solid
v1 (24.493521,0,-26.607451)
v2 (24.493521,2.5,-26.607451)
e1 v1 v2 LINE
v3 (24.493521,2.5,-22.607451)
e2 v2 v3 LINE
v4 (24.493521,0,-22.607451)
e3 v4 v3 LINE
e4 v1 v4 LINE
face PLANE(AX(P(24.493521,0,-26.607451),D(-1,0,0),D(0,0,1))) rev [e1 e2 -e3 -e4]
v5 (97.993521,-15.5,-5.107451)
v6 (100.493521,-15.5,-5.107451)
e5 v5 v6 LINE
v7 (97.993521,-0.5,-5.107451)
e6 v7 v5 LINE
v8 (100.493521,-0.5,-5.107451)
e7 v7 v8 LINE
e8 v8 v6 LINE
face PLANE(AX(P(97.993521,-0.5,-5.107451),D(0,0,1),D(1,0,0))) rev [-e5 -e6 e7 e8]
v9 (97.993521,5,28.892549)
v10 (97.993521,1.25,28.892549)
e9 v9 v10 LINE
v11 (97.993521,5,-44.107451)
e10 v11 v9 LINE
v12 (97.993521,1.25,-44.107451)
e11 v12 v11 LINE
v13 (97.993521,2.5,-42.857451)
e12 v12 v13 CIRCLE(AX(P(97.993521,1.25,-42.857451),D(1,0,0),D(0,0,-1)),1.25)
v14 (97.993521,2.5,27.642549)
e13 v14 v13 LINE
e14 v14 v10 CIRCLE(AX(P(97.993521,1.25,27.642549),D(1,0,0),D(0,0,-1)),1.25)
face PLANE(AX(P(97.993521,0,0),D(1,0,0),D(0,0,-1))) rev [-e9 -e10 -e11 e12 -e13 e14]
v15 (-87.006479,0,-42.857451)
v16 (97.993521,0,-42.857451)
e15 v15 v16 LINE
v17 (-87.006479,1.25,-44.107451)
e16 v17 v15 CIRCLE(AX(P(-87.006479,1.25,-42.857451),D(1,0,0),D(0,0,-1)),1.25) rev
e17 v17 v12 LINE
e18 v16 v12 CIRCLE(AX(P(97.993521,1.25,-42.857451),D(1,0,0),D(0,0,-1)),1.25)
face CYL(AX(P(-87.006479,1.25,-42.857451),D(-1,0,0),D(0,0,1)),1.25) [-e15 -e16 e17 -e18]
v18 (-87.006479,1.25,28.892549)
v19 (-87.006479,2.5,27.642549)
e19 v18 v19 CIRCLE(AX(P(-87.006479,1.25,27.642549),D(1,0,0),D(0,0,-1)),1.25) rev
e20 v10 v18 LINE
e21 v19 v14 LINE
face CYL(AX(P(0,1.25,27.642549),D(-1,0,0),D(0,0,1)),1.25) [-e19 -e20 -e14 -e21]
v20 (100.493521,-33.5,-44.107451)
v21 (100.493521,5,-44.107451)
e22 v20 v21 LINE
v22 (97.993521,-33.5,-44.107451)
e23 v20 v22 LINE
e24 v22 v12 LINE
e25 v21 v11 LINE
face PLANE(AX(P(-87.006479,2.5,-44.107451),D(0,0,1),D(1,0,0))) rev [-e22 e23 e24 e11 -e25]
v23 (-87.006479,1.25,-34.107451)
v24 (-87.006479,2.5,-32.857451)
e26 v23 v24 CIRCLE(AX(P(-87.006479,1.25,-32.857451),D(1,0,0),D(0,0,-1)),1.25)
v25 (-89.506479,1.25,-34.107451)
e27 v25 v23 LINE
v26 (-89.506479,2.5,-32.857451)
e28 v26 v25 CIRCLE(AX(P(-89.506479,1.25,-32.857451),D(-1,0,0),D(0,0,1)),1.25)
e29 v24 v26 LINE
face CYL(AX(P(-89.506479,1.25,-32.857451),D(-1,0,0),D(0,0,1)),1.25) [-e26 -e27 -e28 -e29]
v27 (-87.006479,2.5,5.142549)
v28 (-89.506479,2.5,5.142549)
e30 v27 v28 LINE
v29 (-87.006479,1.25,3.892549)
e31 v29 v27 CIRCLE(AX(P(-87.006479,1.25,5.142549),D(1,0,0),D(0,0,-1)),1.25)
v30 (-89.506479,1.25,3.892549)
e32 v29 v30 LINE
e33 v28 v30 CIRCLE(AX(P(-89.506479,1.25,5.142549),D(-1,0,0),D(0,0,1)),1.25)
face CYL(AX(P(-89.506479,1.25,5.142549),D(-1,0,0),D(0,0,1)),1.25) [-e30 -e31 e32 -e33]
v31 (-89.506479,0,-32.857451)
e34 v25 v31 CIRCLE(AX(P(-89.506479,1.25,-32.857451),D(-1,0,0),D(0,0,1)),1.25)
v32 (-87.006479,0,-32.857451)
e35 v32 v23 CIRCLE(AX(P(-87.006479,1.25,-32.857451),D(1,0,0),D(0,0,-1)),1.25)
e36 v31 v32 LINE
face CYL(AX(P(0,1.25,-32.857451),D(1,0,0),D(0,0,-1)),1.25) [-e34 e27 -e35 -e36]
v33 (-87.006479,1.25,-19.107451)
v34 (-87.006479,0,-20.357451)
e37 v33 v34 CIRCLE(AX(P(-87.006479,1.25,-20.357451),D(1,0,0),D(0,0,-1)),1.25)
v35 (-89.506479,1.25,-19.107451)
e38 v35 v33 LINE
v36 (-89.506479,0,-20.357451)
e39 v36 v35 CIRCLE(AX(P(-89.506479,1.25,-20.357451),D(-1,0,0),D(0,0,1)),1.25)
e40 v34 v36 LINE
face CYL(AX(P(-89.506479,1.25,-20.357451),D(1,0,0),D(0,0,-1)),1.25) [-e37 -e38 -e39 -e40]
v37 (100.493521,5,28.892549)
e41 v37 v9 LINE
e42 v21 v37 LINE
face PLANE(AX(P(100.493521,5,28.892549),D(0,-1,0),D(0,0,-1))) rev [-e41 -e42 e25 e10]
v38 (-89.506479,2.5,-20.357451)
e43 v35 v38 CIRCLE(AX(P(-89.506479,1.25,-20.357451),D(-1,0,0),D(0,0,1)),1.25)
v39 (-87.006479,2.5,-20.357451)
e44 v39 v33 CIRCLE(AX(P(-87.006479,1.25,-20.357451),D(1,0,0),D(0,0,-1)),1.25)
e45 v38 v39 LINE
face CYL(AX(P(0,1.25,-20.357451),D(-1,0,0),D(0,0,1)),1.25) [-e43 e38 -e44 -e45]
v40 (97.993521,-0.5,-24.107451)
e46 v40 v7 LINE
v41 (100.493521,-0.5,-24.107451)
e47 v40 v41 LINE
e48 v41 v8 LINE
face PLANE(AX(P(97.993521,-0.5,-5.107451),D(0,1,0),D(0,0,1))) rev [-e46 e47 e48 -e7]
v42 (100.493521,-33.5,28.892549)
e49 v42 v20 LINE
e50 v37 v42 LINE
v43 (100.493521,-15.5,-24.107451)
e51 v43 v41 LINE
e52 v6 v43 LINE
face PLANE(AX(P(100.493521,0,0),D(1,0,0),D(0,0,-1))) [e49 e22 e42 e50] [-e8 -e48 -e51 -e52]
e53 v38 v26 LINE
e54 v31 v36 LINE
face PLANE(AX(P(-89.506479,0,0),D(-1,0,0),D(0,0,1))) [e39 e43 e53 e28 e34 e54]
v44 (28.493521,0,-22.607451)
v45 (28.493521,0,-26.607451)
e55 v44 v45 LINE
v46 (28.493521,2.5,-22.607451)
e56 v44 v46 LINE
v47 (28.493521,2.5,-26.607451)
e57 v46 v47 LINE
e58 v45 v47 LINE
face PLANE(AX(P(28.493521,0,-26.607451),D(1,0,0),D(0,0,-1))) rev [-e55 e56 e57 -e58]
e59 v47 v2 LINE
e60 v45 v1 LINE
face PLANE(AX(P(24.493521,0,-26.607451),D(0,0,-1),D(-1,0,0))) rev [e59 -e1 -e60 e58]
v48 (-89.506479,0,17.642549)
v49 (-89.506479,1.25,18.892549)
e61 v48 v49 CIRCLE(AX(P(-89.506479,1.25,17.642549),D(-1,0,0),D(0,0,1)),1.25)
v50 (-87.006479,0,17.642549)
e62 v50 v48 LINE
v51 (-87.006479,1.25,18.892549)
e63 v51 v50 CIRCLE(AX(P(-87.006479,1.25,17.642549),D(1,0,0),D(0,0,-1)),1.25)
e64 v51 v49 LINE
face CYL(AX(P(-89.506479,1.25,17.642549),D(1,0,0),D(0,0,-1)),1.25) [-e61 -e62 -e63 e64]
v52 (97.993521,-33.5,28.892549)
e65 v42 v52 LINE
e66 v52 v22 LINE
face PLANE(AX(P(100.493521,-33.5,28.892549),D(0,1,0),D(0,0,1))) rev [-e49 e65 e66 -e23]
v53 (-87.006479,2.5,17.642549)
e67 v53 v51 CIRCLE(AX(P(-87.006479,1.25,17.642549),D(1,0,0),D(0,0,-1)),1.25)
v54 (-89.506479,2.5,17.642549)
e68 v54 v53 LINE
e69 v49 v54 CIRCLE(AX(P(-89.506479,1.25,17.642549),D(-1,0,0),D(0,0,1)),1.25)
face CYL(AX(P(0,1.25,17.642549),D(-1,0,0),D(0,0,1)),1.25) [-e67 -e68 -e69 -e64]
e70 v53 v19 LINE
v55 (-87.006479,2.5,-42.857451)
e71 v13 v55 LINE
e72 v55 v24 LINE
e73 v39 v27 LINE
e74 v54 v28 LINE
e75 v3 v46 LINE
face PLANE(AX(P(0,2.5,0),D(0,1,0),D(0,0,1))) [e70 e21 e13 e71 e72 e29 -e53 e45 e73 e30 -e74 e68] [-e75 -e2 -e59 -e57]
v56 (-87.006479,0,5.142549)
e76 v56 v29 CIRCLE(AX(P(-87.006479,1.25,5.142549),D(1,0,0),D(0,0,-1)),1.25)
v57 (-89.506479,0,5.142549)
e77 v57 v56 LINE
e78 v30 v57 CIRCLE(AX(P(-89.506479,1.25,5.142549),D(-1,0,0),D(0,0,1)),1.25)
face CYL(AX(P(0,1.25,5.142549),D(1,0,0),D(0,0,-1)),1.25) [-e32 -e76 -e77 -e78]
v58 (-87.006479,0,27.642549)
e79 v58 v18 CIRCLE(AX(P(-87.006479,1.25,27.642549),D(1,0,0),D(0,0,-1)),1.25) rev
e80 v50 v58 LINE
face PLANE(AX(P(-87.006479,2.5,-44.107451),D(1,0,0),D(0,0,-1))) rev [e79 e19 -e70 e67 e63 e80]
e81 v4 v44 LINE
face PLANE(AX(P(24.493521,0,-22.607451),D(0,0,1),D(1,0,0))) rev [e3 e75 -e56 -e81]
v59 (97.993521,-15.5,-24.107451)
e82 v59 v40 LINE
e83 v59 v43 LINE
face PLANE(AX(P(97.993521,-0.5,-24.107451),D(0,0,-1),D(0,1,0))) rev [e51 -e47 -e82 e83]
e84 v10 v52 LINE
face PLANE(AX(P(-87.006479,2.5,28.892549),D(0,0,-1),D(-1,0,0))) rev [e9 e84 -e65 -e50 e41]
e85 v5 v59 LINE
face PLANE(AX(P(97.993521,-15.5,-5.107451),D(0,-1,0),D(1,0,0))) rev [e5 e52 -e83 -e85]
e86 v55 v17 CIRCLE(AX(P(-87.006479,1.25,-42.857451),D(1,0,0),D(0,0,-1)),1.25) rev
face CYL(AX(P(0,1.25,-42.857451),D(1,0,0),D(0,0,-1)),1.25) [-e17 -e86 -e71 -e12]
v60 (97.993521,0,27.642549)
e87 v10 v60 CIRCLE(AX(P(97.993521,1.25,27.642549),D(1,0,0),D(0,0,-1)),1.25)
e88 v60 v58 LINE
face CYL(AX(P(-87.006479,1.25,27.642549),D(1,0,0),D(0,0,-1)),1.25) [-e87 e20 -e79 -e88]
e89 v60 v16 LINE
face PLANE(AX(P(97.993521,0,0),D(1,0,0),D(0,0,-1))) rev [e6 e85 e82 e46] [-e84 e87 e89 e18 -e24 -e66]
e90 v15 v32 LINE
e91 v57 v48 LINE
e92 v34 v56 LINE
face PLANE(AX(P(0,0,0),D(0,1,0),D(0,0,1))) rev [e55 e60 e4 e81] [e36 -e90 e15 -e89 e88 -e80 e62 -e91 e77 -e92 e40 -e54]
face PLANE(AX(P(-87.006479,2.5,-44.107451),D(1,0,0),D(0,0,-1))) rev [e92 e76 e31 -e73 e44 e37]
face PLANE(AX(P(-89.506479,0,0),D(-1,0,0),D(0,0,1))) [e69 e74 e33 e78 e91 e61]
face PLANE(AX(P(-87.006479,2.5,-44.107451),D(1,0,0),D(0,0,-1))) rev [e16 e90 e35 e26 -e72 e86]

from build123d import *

# Parameters (mm, degrees)
SKETCH_1_W          = 185
SKETCH_1_H          = 73
EXTRUDE_1_DEPTH     = 2.5
SKETCH_2_W          = 15
SKETCH_2_H          = 2.5
EXTRUDE_2_DEPTH     = 2.5
FILLET_2_R          = 1.25
SKETCH_3_W          = 73
SKETCH_3_H          = 38.5
EXTRUDE_3_DEPTH     = 2.5
FILLET_3_R          = 1.25
SKETCH_4_W          = 19
SKETCH_4_H          = 15
CUT_EXTRUDE_1_DEPTH = 2.5
SKETCH_5_W          = 4
SKETCH_5_H          = 4
CUT_EXTRUDE_2_DEPTH = 2.5


with BuildPart() as part:
    # 草图1 → 凸台-拉伸1 (new body)
    with BuildSketch(Plane(origin=(0, 0, 0), x_dir=(1, 0, 0), z_dir=(0, 1, 0))):
        with Locations((5.493520518, 7.607451404)):
            Rectangle(SKETCH_1_W, SKETCH_1_H)
    extrude(amount=EXTRUDE_1_DEPTH)

    # 草图2 → 凸台-拉伸2 (add)
    with BuildSketch(Plane.ZY.offset(87.006479482)):
        with Locations((-26.607451404, 1.25)):
            Rectangle(SKETCH_2_W, SKETCH_2_H)
        with Locations((11.392548596, 1.25)):
            Rectangle(SKETCH_2_W, SKETCH_2_H)
    extrude(amount=EXTRUDE_2_DEPTH)

    # 圆角2
    fillet_2_edges = [part.edges().sort_by_distance(p)[0] for p in [
        (-88.256479482, 2.5, 3.892548596),
        (-88.256479482, 0, 3.892548596),
        (-88.256479482, 0, 18.892548596),
        (-88.256479482, 2.5, 18.892548596),
        (-88.256479482, 0, -34.107451404),
        (-88.256479482, 2.5, -19.107451404),
        (-88.256479482, 0, -19.107451404),
        (-88.256479482, 2.5, -34.107451404),
    ]]
    fillet(fillet_2_edges, radius=FILLET_2_R - 0.0001)  # a hair under: the kernel refuses the full size

    # 草图3 → 凸台-拉伸3 (add)
    with BuildSketch(Plane(origin=(97.993520518, 0, 0), x_dir=(0, 0, -1), z_dir=(1, 0, 0))):
        with Locations((7.607451404, -14.25)):
            Rectangle(SKETCH_3_W, SKETCH_3_H)
    extrude(amount=EXTRUDE_3_DEPTH)

    # 圆角3
    fillet_3_edges = [part.edges().sort_by_distance(p)[0] for p in [
        (5.493520518, 0, -44.107451404),
        (5.493520518, 2.5, -44.107451404),
        (5.493520518, 0, 28.892548596),
        (5.493520518, 2.5, 28.892548596),
    ]]
    fillet(fillet_3_edges, radius=FILLET_3_R - 0.0001)  # a hair under: the kernel refuses the full size

    # 草图4 → 切除-拉伸1 (cut)
    with BuildSketch(Plane(origin=(100.493520518, 0, 0), x_dir=(0, 0, -1), z_dir=(1, 0, 0))):
        with Locations((14.607451404, -8)):
            Rectangle(SKETCH_4_W, SKETCH_4_H)
    extrude(amount=-CUT_EXTRUDE_1_DEPTH, mode=Mode.SUBTRACT)

    # 草图5 → 切除-拉伸2 (cut)
    with BuildSketch(Plane(origin=(0, 2.5, 0), x_dir=(1, 0, 0), z_dir=(0, 1, 0))):
        with Locations((26.493520518, 24.607451404)):
            Rectangle(SKETCH_5_W, SKETCH_5_H)
    extrude(amount=-CUT_EXTRUDE_2_DEPTH, mode=Mode.SUBTRACT)


solid = part.part
